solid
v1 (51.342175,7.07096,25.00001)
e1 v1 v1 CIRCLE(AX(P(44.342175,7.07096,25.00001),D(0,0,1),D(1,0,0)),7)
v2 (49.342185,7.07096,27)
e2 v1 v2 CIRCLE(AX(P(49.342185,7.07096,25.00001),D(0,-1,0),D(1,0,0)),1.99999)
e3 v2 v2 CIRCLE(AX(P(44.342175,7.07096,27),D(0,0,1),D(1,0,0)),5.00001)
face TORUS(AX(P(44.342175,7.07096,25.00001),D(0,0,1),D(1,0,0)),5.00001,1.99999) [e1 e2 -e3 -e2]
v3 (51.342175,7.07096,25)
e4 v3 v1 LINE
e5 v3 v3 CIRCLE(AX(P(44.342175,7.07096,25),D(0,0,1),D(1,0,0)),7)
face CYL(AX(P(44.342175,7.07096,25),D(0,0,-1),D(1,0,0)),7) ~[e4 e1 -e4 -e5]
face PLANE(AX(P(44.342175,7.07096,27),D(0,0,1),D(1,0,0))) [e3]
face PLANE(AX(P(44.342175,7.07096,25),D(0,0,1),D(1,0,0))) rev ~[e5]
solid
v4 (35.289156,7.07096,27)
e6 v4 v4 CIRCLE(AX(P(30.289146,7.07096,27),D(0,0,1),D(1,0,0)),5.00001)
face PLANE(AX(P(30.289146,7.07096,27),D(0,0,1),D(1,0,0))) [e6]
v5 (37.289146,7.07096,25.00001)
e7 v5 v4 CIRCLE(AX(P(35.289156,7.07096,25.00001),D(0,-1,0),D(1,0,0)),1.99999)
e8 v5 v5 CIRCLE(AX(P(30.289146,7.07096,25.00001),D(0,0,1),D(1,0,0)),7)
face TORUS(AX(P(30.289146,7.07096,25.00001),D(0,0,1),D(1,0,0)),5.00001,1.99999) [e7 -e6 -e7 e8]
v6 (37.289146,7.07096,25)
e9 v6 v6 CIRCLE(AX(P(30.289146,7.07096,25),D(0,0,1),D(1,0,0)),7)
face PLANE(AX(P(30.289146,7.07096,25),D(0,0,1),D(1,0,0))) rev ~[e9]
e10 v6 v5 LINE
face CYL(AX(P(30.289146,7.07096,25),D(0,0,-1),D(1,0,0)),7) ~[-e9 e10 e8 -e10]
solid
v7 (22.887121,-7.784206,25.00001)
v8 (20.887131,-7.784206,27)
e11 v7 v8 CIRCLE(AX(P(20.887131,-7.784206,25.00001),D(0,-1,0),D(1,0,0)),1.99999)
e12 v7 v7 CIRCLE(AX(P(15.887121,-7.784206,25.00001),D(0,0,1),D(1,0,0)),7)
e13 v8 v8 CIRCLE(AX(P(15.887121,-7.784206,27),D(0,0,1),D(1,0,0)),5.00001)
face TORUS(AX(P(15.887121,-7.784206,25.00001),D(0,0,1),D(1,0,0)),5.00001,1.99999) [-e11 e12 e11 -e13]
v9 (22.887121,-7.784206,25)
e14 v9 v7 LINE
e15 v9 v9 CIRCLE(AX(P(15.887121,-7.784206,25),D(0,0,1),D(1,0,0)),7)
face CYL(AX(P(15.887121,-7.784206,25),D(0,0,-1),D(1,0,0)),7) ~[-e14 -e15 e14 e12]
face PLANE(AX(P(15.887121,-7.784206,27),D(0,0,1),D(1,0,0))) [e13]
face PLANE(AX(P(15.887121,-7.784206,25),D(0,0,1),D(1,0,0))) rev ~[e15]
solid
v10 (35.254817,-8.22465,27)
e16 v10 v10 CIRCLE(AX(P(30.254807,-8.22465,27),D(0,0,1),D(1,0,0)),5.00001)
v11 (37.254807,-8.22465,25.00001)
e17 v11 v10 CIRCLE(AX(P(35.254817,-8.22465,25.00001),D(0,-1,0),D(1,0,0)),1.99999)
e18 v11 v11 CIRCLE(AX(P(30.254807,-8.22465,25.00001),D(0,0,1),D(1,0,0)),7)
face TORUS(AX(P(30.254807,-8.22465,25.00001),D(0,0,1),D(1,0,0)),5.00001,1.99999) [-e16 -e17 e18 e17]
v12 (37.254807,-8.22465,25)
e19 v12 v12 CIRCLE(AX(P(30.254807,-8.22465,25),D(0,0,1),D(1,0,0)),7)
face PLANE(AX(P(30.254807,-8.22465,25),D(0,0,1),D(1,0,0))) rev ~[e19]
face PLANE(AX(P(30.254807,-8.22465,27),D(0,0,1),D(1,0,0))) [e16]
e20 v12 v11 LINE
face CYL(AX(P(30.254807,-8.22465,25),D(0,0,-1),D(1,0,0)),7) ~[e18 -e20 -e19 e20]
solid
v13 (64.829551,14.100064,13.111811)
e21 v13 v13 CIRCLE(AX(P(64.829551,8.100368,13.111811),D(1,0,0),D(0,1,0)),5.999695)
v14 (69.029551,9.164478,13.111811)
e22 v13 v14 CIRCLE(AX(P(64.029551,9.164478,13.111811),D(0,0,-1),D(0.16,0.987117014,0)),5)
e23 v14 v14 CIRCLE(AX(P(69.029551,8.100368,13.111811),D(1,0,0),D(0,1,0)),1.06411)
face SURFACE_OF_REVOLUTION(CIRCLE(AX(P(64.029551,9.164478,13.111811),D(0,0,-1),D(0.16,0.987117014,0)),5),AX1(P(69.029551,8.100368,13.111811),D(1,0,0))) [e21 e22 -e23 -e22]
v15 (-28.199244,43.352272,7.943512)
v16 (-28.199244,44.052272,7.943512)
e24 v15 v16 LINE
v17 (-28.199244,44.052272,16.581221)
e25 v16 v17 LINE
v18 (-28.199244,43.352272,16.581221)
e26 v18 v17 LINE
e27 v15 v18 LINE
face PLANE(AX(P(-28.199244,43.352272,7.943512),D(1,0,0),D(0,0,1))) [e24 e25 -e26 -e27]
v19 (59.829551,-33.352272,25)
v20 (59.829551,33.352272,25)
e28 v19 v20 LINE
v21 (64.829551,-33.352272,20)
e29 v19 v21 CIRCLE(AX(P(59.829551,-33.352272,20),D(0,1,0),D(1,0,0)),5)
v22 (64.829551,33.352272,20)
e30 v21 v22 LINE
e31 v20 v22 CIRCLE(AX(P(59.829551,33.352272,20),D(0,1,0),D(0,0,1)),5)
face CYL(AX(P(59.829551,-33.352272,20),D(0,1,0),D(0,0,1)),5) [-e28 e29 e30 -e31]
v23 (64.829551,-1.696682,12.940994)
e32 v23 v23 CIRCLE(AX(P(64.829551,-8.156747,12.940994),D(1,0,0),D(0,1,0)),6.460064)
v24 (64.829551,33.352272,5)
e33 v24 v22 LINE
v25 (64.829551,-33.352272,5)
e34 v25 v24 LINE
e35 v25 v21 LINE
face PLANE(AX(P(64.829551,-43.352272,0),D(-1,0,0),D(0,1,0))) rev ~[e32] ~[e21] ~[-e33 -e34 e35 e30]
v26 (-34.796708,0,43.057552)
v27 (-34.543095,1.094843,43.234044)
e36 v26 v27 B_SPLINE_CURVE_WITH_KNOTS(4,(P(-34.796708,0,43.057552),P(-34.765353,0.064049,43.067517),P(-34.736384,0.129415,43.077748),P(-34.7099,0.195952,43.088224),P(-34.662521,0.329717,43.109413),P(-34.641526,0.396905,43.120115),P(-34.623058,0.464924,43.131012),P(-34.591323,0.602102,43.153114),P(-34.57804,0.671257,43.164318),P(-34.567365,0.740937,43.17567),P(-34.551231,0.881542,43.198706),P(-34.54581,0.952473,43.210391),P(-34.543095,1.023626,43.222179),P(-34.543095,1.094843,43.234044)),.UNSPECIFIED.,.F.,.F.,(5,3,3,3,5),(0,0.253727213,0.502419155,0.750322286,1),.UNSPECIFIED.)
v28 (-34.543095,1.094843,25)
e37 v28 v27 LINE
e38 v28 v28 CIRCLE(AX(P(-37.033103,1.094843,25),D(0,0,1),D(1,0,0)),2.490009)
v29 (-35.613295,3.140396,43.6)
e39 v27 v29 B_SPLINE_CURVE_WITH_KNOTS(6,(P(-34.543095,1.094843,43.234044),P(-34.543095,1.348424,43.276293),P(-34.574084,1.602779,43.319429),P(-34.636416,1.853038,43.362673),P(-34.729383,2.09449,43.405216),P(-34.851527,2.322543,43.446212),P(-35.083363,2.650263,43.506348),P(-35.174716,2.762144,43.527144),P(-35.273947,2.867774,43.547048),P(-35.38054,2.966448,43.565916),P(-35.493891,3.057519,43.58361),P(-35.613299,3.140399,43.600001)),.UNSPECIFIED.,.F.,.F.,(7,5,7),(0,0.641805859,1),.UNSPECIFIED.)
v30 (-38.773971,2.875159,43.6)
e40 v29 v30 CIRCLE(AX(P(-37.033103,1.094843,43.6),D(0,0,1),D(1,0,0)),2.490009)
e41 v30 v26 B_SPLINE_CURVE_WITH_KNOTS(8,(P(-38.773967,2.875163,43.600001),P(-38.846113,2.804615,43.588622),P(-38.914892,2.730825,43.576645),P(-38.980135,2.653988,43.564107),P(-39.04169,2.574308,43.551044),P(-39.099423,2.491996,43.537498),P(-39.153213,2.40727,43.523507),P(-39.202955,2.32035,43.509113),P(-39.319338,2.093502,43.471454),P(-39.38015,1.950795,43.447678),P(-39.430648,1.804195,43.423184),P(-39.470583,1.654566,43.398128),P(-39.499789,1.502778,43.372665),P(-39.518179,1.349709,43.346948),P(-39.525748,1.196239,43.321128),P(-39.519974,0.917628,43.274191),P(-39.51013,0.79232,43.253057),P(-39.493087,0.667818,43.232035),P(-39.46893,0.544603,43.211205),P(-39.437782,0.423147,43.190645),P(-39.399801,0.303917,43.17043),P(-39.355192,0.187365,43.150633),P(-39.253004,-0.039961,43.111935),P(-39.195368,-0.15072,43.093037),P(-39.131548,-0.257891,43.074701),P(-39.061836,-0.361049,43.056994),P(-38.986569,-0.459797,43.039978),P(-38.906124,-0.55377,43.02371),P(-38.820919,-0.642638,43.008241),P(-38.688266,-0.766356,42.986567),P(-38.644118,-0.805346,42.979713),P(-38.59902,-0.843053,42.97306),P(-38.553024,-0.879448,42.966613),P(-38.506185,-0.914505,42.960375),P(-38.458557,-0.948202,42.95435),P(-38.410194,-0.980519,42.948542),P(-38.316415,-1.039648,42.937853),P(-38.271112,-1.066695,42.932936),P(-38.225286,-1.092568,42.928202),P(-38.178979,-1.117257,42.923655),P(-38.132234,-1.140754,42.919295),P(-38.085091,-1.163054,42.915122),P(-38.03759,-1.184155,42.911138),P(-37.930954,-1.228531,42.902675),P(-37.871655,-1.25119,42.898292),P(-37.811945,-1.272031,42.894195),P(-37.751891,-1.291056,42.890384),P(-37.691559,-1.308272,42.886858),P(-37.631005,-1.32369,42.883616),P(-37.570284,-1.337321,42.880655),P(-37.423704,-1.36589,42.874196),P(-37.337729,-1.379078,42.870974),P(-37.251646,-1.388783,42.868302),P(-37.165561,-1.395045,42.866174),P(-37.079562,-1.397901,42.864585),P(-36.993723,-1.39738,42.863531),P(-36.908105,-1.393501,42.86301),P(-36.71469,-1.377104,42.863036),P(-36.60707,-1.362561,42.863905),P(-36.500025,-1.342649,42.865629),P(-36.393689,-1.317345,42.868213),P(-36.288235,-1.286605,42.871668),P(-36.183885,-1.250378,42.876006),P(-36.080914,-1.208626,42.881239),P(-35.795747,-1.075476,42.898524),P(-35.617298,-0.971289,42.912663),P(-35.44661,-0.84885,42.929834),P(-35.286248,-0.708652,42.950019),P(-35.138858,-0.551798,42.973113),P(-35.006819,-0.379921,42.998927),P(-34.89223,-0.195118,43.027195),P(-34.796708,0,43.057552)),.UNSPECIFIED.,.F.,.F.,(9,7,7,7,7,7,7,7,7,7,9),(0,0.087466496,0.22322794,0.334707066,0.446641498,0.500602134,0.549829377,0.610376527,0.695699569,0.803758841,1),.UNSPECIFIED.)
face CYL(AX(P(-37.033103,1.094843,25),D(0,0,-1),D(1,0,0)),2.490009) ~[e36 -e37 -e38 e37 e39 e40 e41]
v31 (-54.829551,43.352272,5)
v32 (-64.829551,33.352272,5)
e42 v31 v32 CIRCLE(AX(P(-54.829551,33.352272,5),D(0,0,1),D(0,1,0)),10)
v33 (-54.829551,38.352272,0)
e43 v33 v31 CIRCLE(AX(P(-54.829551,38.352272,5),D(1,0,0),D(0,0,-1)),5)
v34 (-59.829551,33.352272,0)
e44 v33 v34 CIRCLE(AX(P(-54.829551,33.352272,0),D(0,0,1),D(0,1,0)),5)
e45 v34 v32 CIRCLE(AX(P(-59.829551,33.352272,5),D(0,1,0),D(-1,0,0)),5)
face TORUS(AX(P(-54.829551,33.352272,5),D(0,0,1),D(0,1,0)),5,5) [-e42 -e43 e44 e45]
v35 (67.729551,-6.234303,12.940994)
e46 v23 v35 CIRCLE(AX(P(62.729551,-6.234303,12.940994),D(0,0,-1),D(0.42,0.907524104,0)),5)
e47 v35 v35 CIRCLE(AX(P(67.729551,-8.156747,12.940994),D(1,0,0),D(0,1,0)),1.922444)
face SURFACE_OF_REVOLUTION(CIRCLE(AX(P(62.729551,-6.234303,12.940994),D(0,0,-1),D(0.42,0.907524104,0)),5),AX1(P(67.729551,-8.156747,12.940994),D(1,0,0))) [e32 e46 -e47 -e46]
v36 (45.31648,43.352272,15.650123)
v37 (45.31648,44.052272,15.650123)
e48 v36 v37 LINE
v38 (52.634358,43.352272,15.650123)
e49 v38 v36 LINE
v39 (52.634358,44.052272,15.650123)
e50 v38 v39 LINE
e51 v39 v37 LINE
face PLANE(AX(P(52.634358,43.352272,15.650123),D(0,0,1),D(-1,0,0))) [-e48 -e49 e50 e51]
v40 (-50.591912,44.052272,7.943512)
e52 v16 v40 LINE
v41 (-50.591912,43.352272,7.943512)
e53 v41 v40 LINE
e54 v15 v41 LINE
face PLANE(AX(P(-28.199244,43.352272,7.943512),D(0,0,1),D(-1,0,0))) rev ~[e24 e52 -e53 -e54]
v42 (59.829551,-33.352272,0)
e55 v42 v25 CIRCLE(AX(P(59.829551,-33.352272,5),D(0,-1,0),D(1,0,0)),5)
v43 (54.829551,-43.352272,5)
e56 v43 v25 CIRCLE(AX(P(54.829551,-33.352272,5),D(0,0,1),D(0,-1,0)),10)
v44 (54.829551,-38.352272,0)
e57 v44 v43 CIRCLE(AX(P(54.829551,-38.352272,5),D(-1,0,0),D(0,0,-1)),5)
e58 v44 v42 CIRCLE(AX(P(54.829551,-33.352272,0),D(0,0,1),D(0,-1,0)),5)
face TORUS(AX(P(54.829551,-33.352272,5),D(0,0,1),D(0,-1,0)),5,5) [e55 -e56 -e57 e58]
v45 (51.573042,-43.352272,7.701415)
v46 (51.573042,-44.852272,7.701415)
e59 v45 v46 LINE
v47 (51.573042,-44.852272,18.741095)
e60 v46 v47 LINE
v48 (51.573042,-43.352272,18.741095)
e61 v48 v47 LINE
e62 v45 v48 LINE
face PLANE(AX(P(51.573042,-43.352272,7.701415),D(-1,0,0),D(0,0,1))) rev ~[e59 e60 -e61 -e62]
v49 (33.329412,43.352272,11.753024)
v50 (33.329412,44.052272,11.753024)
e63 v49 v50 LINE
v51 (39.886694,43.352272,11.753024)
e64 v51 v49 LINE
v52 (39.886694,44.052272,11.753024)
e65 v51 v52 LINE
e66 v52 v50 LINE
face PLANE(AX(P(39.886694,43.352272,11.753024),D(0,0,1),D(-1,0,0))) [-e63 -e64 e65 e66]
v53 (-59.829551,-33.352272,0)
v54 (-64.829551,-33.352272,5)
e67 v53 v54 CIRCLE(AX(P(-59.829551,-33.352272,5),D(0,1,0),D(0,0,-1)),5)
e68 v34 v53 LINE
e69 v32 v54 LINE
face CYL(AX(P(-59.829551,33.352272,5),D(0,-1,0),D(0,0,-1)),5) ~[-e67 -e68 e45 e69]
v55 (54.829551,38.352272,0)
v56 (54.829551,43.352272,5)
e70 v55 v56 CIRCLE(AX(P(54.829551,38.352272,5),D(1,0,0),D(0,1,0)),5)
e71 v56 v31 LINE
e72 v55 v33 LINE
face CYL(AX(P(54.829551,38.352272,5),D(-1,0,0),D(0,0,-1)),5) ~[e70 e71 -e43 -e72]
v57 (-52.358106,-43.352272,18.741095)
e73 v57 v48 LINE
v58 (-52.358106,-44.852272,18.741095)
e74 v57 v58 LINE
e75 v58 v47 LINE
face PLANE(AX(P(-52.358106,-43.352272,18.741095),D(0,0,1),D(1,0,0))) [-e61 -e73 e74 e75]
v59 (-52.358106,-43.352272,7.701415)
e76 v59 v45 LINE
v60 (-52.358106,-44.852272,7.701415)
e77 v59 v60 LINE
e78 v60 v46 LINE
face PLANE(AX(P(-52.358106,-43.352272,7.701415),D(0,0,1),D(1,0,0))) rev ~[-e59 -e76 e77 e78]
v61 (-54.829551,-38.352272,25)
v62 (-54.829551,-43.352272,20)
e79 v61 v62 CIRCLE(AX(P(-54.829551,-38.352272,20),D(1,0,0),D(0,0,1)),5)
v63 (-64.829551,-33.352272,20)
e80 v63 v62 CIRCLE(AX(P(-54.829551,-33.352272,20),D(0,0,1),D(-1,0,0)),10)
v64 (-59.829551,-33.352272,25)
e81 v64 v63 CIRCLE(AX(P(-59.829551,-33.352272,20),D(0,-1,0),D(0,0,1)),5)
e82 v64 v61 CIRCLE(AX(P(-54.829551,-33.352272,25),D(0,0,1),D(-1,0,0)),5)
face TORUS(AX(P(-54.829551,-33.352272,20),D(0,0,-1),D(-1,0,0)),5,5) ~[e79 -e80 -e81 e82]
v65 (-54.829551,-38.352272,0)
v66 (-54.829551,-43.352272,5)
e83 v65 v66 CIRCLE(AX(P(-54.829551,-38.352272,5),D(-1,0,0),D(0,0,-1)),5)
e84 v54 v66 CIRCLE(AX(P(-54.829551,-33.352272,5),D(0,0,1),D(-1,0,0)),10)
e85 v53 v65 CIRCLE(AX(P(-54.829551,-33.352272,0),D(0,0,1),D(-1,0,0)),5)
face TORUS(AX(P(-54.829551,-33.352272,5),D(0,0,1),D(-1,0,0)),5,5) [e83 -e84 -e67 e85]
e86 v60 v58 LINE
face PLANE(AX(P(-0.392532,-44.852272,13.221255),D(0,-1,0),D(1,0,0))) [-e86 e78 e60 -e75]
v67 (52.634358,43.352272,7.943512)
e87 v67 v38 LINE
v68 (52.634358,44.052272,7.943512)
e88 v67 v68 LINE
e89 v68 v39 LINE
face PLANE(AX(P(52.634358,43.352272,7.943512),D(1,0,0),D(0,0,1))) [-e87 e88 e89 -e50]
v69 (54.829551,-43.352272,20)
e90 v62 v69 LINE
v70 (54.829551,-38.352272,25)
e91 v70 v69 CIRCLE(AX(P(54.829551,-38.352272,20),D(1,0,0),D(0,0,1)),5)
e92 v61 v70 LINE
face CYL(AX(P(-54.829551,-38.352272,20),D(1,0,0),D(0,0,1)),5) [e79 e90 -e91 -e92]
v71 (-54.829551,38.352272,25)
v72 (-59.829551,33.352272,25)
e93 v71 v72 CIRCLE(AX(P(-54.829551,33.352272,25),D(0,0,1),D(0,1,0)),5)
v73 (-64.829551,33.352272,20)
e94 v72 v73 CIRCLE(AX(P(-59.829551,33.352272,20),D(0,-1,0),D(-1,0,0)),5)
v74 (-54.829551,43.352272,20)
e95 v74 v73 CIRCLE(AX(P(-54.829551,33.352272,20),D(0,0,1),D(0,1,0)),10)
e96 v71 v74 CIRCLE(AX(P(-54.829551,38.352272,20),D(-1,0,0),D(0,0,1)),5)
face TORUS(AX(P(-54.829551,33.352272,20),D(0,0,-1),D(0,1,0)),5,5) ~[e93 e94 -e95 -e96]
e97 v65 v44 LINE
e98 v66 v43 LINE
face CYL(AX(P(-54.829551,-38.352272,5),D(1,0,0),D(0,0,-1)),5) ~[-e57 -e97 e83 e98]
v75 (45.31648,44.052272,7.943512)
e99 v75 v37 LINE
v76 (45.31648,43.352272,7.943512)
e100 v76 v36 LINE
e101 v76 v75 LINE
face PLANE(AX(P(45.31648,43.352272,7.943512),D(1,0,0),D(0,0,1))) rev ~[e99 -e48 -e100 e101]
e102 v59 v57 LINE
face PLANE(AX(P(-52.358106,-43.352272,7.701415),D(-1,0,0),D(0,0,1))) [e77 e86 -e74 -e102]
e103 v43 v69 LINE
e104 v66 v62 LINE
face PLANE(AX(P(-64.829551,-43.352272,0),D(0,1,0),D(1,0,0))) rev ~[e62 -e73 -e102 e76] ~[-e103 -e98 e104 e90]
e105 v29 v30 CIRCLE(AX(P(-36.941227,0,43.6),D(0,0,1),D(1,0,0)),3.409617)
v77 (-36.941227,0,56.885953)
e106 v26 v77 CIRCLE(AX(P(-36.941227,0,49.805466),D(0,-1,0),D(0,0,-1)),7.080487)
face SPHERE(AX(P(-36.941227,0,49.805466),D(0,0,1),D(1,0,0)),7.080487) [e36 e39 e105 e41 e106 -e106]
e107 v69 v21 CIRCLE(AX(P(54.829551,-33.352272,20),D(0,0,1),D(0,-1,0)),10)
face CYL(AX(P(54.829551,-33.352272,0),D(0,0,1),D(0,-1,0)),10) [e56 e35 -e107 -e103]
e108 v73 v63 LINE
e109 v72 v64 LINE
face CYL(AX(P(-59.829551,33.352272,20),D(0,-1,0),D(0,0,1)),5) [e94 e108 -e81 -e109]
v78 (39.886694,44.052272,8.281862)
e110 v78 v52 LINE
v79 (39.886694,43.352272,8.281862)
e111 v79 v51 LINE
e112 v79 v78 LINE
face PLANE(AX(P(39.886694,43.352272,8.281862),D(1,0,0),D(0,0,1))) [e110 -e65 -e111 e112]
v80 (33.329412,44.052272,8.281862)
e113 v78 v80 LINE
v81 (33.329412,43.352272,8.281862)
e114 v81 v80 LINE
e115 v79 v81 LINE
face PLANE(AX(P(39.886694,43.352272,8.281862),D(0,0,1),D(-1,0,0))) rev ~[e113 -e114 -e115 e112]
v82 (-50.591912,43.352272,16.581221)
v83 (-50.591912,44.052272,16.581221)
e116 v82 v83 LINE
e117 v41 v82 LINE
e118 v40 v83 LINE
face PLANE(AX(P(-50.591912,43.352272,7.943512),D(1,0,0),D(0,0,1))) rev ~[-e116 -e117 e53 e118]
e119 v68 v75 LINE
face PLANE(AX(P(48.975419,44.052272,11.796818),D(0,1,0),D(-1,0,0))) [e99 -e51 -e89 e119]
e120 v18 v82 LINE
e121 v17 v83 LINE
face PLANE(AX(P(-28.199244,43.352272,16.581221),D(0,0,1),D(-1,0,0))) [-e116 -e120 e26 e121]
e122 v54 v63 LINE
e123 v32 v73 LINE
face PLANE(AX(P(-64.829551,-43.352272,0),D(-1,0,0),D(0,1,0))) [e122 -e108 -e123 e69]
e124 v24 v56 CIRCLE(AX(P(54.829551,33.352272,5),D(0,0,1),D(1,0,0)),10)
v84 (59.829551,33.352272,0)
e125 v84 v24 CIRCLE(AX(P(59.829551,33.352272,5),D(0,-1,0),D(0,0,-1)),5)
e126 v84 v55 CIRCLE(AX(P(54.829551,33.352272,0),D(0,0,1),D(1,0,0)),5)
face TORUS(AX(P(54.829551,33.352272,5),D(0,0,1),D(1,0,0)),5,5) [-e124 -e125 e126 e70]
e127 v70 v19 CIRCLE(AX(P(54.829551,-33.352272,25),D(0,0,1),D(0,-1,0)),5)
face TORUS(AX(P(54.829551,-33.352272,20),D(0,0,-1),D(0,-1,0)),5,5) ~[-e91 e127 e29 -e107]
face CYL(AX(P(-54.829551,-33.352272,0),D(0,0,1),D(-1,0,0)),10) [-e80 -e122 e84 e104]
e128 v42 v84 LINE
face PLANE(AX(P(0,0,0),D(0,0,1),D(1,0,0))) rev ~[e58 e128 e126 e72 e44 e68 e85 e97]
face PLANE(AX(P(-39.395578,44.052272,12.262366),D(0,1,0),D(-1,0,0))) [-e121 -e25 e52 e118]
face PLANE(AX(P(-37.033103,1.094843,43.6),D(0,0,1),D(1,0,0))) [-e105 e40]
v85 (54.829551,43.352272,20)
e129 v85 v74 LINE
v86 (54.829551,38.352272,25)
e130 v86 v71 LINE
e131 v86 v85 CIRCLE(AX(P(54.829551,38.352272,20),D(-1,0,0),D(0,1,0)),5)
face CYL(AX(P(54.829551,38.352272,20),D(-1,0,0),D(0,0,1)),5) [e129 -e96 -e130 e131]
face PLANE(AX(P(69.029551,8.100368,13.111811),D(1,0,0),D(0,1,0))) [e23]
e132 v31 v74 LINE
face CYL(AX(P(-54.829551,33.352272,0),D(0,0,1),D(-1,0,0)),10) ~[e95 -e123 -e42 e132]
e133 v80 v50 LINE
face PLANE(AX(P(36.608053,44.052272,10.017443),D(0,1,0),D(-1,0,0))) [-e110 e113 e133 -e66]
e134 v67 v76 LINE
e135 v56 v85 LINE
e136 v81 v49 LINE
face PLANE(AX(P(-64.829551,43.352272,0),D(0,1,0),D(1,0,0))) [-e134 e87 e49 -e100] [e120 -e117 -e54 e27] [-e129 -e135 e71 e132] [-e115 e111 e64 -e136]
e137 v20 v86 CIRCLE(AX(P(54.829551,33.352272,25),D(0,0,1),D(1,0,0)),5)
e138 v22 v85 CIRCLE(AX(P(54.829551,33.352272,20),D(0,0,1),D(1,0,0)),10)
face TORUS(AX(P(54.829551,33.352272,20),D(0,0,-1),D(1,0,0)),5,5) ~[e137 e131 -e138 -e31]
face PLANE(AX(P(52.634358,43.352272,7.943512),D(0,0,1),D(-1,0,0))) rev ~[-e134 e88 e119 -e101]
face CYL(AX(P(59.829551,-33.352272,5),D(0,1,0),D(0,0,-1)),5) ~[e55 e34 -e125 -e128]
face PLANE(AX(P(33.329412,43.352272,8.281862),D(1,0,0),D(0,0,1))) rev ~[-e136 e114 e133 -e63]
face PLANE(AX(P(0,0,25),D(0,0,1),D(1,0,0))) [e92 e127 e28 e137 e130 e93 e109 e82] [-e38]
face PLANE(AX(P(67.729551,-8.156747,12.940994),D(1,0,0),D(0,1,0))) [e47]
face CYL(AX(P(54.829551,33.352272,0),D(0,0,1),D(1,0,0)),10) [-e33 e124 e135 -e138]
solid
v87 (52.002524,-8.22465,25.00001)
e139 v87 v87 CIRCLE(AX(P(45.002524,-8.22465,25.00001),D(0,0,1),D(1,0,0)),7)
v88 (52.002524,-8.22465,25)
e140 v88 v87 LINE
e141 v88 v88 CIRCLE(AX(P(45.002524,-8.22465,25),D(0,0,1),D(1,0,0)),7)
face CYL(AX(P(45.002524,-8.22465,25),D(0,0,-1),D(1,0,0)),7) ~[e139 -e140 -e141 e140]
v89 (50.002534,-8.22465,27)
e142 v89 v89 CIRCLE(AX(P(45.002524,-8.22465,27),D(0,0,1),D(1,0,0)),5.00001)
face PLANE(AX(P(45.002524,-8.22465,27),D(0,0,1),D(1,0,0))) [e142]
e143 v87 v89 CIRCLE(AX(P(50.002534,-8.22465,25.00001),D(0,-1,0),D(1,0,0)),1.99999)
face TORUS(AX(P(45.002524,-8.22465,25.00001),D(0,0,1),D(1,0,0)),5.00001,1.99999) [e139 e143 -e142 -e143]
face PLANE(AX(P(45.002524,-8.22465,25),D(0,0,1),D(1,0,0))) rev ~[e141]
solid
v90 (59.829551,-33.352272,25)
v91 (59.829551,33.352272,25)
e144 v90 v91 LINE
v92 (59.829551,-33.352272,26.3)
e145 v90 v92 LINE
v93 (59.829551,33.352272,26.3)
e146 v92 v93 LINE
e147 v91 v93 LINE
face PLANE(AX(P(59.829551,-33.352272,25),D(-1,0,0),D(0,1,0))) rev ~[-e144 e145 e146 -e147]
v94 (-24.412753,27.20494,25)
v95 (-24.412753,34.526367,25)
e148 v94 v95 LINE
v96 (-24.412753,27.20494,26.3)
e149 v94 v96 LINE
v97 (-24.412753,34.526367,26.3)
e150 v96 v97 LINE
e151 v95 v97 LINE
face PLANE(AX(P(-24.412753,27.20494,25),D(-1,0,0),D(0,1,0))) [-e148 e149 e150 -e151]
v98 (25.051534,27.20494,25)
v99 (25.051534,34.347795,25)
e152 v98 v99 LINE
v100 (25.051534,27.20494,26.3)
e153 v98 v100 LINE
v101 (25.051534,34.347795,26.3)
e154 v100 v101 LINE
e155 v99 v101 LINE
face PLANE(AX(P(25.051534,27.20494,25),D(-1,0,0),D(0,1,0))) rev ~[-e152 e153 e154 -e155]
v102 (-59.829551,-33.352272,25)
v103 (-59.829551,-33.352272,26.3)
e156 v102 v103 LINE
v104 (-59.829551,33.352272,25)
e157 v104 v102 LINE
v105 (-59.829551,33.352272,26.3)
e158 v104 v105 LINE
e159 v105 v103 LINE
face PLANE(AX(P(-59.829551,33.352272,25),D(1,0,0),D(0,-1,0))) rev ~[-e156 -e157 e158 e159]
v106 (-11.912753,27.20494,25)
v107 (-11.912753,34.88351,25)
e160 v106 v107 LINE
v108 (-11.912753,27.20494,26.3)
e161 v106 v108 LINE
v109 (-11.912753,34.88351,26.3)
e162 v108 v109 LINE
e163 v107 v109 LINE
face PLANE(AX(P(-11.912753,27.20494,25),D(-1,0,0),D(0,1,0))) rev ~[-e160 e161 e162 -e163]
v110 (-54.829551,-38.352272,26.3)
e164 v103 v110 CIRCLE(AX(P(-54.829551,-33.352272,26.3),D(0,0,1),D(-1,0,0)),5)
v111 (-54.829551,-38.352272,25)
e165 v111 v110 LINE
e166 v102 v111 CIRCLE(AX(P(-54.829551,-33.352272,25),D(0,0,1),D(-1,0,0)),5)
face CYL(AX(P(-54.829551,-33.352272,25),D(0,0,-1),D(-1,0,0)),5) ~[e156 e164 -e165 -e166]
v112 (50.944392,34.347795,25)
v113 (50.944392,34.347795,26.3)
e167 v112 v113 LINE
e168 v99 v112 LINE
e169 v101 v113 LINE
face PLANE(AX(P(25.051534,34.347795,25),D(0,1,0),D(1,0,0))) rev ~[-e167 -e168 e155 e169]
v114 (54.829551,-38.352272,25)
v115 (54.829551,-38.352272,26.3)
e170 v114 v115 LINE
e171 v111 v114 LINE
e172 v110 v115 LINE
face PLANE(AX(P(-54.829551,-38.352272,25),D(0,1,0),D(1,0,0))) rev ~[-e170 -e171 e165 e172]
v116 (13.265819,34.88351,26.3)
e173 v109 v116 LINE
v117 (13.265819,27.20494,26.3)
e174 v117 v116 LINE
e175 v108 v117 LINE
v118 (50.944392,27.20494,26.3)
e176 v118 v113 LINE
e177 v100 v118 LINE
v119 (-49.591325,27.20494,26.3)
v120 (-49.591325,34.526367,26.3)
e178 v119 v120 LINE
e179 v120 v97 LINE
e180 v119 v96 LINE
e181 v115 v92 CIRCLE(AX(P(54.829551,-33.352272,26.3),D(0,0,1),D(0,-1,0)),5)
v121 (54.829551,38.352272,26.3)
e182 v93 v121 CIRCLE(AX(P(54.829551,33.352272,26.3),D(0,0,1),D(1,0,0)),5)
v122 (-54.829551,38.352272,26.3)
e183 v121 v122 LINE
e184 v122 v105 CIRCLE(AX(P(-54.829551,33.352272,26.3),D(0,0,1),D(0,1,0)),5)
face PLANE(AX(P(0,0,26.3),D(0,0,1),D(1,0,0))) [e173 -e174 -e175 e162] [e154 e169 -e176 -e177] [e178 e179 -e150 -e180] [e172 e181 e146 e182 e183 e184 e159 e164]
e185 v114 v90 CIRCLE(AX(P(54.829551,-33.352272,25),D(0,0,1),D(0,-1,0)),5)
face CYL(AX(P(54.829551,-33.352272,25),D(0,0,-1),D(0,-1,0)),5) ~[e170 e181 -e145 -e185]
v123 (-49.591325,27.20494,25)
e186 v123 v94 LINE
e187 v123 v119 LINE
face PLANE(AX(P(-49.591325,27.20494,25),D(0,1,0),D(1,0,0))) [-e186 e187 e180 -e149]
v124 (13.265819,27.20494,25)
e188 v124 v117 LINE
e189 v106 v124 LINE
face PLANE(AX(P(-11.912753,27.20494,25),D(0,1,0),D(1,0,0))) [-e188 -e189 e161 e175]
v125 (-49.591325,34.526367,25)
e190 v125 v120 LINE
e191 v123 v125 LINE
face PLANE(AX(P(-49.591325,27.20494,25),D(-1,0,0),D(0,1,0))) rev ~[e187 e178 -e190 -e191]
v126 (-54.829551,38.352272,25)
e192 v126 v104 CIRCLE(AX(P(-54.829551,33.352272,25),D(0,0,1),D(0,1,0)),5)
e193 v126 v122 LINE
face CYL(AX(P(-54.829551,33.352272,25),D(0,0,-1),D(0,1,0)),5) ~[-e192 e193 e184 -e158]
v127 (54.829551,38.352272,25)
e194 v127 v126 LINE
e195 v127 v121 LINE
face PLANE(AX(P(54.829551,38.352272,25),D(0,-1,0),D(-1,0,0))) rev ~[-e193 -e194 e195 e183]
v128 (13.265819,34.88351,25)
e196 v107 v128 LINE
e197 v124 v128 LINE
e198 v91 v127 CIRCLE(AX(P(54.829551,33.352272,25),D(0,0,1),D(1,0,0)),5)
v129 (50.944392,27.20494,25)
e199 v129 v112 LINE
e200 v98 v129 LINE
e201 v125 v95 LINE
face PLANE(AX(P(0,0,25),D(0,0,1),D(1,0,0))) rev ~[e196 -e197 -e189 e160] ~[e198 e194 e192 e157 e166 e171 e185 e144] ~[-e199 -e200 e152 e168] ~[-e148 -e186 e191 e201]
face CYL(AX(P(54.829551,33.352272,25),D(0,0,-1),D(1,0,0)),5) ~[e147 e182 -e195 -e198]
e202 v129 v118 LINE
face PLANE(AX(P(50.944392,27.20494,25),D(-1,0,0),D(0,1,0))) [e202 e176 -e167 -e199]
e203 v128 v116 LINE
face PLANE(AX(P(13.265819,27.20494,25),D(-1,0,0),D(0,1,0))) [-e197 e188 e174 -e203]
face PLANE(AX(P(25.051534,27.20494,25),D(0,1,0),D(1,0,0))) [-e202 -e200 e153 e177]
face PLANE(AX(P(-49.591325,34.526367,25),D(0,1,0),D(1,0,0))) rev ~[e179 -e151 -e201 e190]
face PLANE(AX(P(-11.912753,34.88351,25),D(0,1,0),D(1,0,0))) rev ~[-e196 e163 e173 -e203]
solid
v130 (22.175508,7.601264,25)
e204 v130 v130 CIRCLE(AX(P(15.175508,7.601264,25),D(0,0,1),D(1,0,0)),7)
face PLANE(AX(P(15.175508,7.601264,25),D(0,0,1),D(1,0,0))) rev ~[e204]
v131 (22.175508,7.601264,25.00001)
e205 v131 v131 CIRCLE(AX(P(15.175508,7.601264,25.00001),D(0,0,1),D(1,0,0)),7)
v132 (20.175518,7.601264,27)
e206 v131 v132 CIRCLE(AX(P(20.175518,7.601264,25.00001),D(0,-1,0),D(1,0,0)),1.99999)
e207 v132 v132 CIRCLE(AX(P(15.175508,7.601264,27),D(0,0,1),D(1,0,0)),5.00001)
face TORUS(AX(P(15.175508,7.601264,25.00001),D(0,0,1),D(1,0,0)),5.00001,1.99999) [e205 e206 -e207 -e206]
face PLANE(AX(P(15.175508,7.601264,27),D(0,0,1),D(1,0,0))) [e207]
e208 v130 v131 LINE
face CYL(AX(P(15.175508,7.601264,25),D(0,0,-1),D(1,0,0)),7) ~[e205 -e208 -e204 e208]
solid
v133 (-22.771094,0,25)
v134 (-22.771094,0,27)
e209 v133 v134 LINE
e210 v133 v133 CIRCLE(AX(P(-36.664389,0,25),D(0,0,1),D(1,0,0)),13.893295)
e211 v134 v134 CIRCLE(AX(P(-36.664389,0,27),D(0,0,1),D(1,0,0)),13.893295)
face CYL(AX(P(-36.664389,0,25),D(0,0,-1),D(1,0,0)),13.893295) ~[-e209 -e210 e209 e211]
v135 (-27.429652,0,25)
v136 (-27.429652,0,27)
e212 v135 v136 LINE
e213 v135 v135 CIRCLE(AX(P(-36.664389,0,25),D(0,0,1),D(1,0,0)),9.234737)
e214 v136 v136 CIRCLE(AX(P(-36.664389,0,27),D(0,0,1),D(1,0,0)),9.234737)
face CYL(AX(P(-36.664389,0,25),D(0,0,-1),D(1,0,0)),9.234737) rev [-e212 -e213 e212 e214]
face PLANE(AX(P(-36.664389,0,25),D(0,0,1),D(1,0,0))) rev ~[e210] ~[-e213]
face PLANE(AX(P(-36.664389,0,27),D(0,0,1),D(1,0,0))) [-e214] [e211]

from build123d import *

# Parameters (mm, degrees)
F0_W      = 129.659101367
F0_H      = 86.704544723
F1_DEPTH  = 25
F2_R      = 10
F3_R      = 5
F4_R      = 7
F5_DEPTH  = 2
F4_R_2    = 13.8932950385
F4_R_3    = 9.2347369707
F6_R      = 1.99999
F6_2_R    = 1.99999
F6_3_R    = 1.99999
F6_4_R    = 1.99999
F6_5_R    = 1.99999
F6_6_R    = 1.99999
F7_R      = 2.4900088952
F8_DEPTH  = 18.6
F11_R     = 6.4600643812
F12_DEPTH = 2.9
F14_R     = 5.9996954232
F15_DEPTH = 4.2
F17_W     = 25.178572163
F17_H     = 7.3214266449
F17_H_2   = 7.6785702258
F17_W_2   = 25.8928574622
F17_H_3   = 7.1428548545
F18_DEPTH = 1.3
F19_W     = 22.39266783
F19_H     = 8.6377086118
F19_W_2   = 7.3178783059
F19_H_2   = 7.7066114172
F19_W_3   = 6.5572820604
F19_H_3   = 3.4711612388
F20_DEPTH = 0.7
F21_W     = 103.9311476052
F21_H     = 11.0396803357
F22_DEPTH = 1.5


# Not quite as in the source:
# - a fillet or chamfer that OpenCascade refuses, or shapes differently, is made with other operations: its cross-section is extruded or revolved along the edge and cut away or added
# - a fillet or chamfer is up to 0.001 mm smaller than in the source, because OpenCascade refuses the exact size


with BuildPart() as f1:
    # F0 (on Top) → F1 (new body)
    with BuildSketch(Plane.XY):
        Rectangle(F0_W, F0_H)
    extrude(amount=F1_DEPTH)

    # F2
    f2_edges = [f1.edges().sort_by_distance(p)[0] for p in [
        (-64.829551, -43.352272, 12.5),
        (-64.829551, 43.352272, 12.5),
        (64.829551, -43.352272, 12.5),
        (64.829551, 43.352272, 12.5),
    ]]
    fillet(f2_edges, radius=F2_R)

    # F3
    f3_edges = [f1.edges().sort_by_distance(p)[0] for p in [
        (0, -43.352272, 25),
        (-61.900618, -40.42334, 25),
        (61.900618, -40.42334, 25),
        (-64.829551, 0, 25),
        (64.829551, 0, 25),
        (-61.900618, 40.42334, 25),
        (61.900618, 40.42334, 25),
        (0, 43.352272, 25),
        (0, -43.352272, 0),
        (-61.900618, -40.42334, 0),
        (61.900618, -40.42334, 0),
        (-64.829551, 0, 0),
        (64.829551, 0, 0),
        (-61.900618, 40.42334, 0),
        (61.900618, 40.42334, 0),
        (0, 43.352272, 0),
    ]]
    fillet(f3_edges, radius=F3_R)

    # F7 (on face) → F8 (join)
    with BuildSketch(Plane.XY.offset(25)):
        with Locations((-37.0331034064, 1.0948430281)):
            Circle(F7_R)
    extrude(amount=F8_DEPTH)

    # F9 (on Front) → F10 (revolve)
    with BuildSketch(Plane.XZ):
        with BuildLine():
            Line((-36.9412265718, 49.8054660857), (-36.9412265718, 42.7249787817))
            ThreePointArc((-36.9412265718, 42.7249787817), (-29.8607392679, 49.8054660857), (-36.9412265718, 56.8859533896))
            Line((-36.9412265718, 56.8859533896), (-36.9412265718, 49.8054660857))
        make_face()
    revolve(axis=Axis((-36.9412265718, 0, 53.3457097376), (0, 0, 1)))

    # F11 (on face) → F12 (join)
    with BuildSketch(Plane.YZ.offset(64.8295506835)):
        with Locations((-8.1567466259, 12.9409944639)):
            Circle(F11_R)
    extrude(amount=F12_DEPTH)

    # F13: fillet of radius 5 on 1 edges, made by hand

    # F13_s1 → F13_t2 (revolve, cut)
    with BuildSketch(Plane.XY.offset(12.9409944639)):
        with BuildLine():
            ThreePointArc((64.8295506835, -1.6966822447), (66.9426255701, -3.5417203629), (67.7295506835, -6.2343027665))
            Line((67.7295506835, -6.2343027665), (67.7295506835, -1.6966822447))
            Line((67.7295506835, -1.6966822447), (64.8295506835, -1.6966822447))
        make_face()
    revolve(axis=Axis((67.7295506835, -8.1567466259, 12.9409944639), (1, 0, 0)), mode=Mode.SUBTRACT)

    # F14 (on face) → F15 (join)
    with BuildSketch(Plane.YZ.offset(64.8295506835)):
        with Locations((8.1003680825, 13.1118111312)):
            Circle(F14_R)
    extrude(amount=F15_DEPTH)

    # F16: fillet of radius 5 on 1 edges, made by hand

    # F16_s1 → F16_t2 (revolve, cut)
    with BuildSketch(Plane.XY.offset(13.1118111312)):
        with BuildLine():
            ThreePointArc((64.8295506835, 14.1000635057), (67.8374372364, 12.4048487832), (69.0295506835, 9.164478434))
            Line((69.0295506835, 9.164478434), (69.0295506835, 14.1000635057))
            Line((69.0295506835, 14.1000635057), (64.8295506835, 14.1000635057))
        make_face()
    revolve(axis=Axis((69.0295506835, 8.1003680825, 13.1118111312), (1, 0, 0)), mode=Mode.SUBTRACT)

    # F19 (on face) → F20 (join)
    with BuildSketch(Plane(origin=(0, 43.3522723615, 0), x_dir=(-1, 0, 0), z_dir=(0, 1, 0))):
        with Locations((39.3955782056, 12.2623662464)):
            Rectangle(F19_W, F19_H)
        with Locations((-48.9754192531, 11.7968176492)):
            Rectangle(F19_W_2, F19_H_2)
        with Locations((-36.6080533713, 10.0174429826)):
            Rectangle(F19_W_3, F19_H_3)
    extrude(amount=F20_DEPTH)

    # F21 (on face) → F22 (join)
    with BuildSketch(Plane.XZ.offset(43.3522723615)):
        with Locations((-0.3925319761, 13.2212552708)):
            Rectangle(F21_W, F21_H)
    extrude(amount=F22_DEPTH)


with BuildPart() as f5:
    # F4 (on face) → F5 (new body)
    with BuildSketch(Plane.XY.offset(25)):
        with Locations((15.1755077144, 7.6012640881)):
            Circle(F4_R)
    extrude(amount=F5_DEPTH)

    # F6 (radius 2 in the source; OpenCascade refuses exactly that, so slightly less here)
    f6_edges = [f5.edges().sort_by_distance(p)[0] for p in [
        (8.175508, 7.601264, 27),
    ]]
    fillet(f6_edges, radius=F6_R)


with BuildPart() as f5b:
    # F4 (on face) → F5, piece 2 (new body)
    with BuildSketch(Plane.XY.offset(25)):
        with Locations((30.2891464283, 7.0709597009)):
            Circle(F4_R)
    extrude(amount=F5_DEPTH)

    # F6#2 (radius 2 in the source; OpenCascade refuses exactly that, so slightly less here)
    f6_2_edges = [f5b.edges().sort_by_distance(p)[0] for p in [
        (23.289146, 7.07096, 27),
    ]]
    fillet(f6_2_edges, radius=F6_2_R)


with BuildPart() as f5c:
    # F4 (on face) → F5, piece 3 (new body)
    with BuildSketch(Plane.XY.offset(25)):
        with Locations((44.3421745052, 7.0709597009)):
            Circle(F4_R)
    extrude(amount=F5_DEPTH)

    # F6#3 (radius 2 in the source; OpenCascade refuses exactly that, so slightly less here)
    f6_3_edges = [f5c.edges().sort_by_distance(p)[0] for p in [
        (37.342175, 7.07096, 27),
    ]]
    fillet(f6_3_edges, radius=F6_3_R)


with BuildPart() as f5d:
    # F4 (on face) → F5, piece 4 (new body)
    with BuildSketch(Plane.XY.offset(25)):
        with Locations((15.8871207386, -7.7842059545)):
            Circle(F4_R)
    extrude(amount=F5_DEPTH)

    # F6#4 (radius 2 in the source; OpenCascade refuses exactly that, so slightly less here)
    f6_4_edges = [f5d.edges().sort_by_distance(p)[0] for p in [
        (8.887121, -7.784206, 27),
    ]]
    fillet(f6_4_edges, radius=F6_4_R)


with BuildPart() as f5e:
    # F4 (on face) → F5, piece 5 (new body)
    with BuildSketch(Plane.XY.offset(25)):
        with Locations((30.2548073232, -8.2246502861)):
            Circle(F4_R)
    extrude(amount=F5_DEPTH)

    # F6#5 (radius 2 in the source; OpenCascade refuses exactly that, so slightly less here)
    f6_5_edges = [f5e.edges().sort_by_distance(p)[0] for p in [
        (23.254807, -8.22465, 27),
    ]]
    fillet(f6_5_edges, radius=F6_5_R)


with BuildPart() as f5f:
    # F4 (on face) → F5, piece 6 (new body)
    with BuildSketch(Plane.XY.offset(25)):
        with Locations((45.0025238097, -8.2246502861)):
            Circle(F4_R)
    extrude(amount=F5_DEPTH)

    # F6#6 (radius 2 in the source; OpenCascade refuses exactly that, so slightly less here)
    f6_6_edges = [f5f.edges().sort_by_distance(p)[0] for p in [
        (38.002524, -8.22465, 27),
    ]]
    fillet(f6_6_edges, radius=F6_6_R)


with BuildPart() as f5g:
    # F4 (on face) → F5, piece 7 (new body)
    with BuildSketch(Plane.XY.offset(25)):
        with Locations((-36.6643890738, 0)):
            Circle(F4_R_2)
        with Locations((-36.6643890738, 0)):
            Circle(F4_R_3, mode=Mode.SUBTRACT)
    extrude(amount=F5_DEPTH)


with BuildPart() as f18:
    # F17 (on face) → F18 (new body)
    with BuildSketch(Plane.XY.offset(25)):
        with BuildLine():
            ThreePointArc((-54.8295506835, 38.3522723615), (-58.3650845894, 36.8878062674), (-59.8295506835, 33.3522723615))
            Line((-59.8295506835, 33.3522723615), (-59.8295506835, -33.3522723615))
            ThreePointArc((-59.8295506835, -33.3522723615), (-58.3650845894, -36.8878062674), (-54.8295506835, -38.3522723615))
            Line((-54.8295506835, -38.3522723615), (54.8295506835, -38.3522723615))
            ThreePointArc((54.8295506835, -38.3522723615), (58.3650845894, -36.8878062674), (59.8295506835, -33.3522723615))
            Line((59.8295506835, -33.3522723615), (59.8295506835, 33.3522723615))
            ThreePointArc((59.8295506835, 33.3522723615), (58.3650845894, 36.8878062674), (54.8295506835, 38.3522723615))
            Line((54.8295506835, 38.3522723615), (-54.8295506835, 38.3522723615))
        make_face()
        with Locations((-37.002039142, 30.865653418)):
            Rectangle(F17_W, F17_H, mode=Mode.SUBTRACT)
        with Locations((0.6765332073, 31.0442252085)):
            Rectangle(F17_W, F17_H_2, mode=Mode.SUBTRACT)
        with Locations((37.997962907, 30.7763675228)):
            Rectangle(F17_W_2, F17_H_3, mode=Mode.SUBTRACT)
    extrude(amount=F18_DEPTH)


solid = Compound([f1.part, f5.part, f5b.part, f5c.part, f5d.part, f5e.part, f5f.part, f5g.part, f18.part])
